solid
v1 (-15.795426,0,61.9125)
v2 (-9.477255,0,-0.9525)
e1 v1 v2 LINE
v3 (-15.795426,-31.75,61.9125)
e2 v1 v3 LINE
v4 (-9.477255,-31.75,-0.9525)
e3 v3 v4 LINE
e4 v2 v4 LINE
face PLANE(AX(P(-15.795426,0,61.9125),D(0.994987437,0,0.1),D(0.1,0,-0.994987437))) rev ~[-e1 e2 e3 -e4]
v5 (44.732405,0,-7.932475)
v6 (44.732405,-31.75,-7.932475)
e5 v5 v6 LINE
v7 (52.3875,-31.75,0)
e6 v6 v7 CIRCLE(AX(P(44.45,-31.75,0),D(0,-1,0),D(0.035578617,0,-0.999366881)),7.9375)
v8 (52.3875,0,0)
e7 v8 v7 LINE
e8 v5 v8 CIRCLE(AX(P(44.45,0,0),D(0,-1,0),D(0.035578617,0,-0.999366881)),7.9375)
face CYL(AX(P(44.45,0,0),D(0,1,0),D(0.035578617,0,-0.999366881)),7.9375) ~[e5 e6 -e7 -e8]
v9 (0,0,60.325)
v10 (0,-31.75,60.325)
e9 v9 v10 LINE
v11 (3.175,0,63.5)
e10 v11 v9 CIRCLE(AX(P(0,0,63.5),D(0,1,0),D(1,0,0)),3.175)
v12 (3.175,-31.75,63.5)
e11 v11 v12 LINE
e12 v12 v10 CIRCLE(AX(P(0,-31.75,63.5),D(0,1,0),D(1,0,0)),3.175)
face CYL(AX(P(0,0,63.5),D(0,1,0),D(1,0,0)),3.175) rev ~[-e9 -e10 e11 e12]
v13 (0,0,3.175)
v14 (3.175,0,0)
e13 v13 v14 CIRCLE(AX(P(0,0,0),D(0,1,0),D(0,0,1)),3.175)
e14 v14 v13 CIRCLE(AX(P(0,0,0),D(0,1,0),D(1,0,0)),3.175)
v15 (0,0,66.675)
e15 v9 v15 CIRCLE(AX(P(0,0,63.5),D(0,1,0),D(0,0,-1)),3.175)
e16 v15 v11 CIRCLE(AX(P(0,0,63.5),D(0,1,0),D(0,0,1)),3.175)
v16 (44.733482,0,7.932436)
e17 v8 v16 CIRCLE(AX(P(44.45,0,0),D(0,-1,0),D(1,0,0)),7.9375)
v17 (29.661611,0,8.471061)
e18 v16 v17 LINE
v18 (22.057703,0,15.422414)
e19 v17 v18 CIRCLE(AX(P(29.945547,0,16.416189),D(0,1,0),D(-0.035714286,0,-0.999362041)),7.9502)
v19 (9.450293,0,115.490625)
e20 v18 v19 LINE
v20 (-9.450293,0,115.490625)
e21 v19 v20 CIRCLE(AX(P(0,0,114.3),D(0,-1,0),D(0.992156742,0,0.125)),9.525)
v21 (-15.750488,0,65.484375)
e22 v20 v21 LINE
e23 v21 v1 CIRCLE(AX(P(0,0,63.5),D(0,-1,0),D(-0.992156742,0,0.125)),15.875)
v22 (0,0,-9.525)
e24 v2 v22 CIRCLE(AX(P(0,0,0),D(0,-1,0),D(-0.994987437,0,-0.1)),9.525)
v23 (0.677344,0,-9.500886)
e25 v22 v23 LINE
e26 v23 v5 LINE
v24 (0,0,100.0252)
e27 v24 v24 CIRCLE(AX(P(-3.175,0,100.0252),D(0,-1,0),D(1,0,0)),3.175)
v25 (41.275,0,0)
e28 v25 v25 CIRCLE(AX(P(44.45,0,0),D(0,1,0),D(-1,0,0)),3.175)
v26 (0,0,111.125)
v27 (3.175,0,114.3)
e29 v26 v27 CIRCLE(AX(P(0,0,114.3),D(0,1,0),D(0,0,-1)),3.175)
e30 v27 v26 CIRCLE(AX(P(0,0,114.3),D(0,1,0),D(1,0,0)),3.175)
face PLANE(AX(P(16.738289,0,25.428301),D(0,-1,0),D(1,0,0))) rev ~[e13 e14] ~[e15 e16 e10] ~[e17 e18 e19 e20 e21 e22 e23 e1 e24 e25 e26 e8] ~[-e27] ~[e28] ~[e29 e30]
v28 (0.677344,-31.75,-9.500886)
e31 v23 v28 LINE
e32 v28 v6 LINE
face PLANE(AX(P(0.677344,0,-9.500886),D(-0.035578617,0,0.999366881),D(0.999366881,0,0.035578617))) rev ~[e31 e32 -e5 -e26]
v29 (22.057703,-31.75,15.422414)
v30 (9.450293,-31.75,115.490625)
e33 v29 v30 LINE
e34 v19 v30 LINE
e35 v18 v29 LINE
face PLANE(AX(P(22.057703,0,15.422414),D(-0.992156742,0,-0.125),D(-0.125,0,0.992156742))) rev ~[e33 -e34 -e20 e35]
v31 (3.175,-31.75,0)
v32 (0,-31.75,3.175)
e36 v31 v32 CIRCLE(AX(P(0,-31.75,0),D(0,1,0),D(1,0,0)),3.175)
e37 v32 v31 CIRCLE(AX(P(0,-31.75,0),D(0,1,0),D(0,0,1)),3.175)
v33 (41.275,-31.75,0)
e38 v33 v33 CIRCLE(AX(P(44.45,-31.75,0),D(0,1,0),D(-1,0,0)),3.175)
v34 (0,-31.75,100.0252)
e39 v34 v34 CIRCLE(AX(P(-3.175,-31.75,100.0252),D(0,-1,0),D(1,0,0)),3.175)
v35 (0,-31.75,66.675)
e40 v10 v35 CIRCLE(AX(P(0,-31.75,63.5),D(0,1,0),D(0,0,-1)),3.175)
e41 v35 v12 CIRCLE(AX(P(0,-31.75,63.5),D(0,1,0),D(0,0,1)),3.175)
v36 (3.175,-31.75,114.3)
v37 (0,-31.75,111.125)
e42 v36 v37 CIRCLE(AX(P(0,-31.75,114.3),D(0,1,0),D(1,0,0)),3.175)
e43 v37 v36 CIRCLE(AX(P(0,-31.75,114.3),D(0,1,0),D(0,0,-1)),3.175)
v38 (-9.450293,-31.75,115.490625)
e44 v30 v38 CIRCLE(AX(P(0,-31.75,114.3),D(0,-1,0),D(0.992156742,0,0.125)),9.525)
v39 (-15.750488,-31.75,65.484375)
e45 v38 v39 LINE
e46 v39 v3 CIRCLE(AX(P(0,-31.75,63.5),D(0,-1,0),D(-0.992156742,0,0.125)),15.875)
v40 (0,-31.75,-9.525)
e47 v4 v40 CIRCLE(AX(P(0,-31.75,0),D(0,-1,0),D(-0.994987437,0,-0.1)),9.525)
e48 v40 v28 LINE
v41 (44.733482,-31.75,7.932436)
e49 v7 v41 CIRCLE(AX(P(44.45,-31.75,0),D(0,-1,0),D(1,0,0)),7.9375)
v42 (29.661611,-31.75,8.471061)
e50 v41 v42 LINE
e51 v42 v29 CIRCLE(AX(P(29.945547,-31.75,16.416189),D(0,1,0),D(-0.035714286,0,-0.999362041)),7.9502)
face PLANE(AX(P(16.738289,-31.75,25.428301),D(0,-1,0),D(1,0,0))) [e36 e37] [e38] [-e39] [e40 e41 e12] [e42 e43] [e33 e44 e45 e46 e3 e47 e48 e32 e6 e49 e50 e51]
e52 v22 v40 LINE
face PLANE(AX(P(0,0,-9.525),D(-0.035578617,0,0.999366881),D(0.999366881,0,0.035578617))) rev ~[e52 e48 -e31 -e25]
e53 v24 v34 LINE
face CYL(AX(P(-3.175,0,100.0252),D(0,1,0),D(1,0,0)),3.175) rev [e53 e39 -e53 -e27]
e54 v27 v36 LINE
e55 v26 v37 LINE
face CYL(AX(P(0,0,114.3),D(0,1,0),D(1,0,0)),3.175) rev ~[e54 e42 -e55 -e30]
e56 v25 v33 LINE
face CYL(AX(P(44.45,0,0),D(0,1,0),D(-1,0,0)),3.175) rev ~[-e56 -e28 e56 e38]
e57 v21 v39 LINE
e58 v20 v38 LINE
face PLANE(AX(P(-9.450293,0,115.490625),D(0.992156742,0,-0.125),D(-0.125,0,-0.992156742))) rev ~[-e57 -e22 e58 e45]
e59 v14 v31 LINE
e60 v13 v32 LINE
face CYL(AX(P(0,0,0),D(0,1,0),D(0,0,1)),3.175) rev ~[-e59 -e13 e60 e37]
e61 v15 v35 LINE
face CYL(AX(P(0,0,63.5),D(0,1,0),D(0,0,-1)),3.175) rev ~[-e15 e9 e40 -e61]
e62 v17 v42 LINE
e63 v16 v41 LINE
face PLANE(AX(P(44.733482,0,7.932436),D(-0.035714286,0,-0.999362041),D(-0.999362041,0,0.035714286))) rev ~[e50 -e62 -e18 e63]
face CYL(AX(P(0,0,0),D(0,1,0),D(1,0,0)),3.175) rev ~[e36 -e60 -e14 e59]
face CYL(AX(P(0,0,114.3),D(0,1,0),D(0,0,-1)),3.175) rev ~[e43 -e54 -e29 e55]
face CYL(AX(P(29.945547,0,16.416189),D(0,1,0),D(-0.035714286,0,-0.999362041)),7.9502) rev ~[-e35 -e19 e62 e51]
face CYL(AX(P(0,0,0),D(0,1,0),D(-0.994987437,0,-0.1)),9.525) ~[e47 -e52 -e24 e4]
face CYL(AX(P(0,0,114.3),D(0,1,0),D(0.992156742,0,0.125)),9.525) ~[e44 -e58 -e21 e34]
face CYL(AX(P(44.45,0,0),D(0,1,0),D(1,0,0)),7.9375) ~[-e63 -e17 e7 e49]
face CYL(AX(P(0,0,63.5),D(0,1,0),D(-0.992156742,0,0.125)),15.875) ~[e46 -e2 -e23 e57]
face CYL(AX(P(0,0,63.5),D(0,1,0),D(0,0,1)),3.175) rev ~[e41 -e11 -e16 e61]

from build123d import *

# Parameters (mm, degrees)
F0_R     = 3.175
F1_DEPTH = 31.75


with BuildPart() as f1:
    # F0 (on Front) → F1 (new body)
    with BuildSketch(Plane.XZ):
        with BuildLine():
            Line((22.0577025061, 15.4224140263), (15.7504882737, 65.484375))
            ThreePointArc((15.7504882737, 65.484375), (15.8438414904, 64.4941387366), (15.875, 63.5))
            ThreePointArc((15.875, 63.5), (11.2253201513, 52.2746798487), (0, 47.625))
            Line((0, 47.625), (0, 9.525))
            ThreePointArc((0, 9.525), (6.7351920908, 6.7351920908), (9.525, 0))
            Line((9.525, 0), (36.5125, 0))
            ThreePointArc((36.5125, 0), (38.9384772185, 5.7120069047), (44.7334821429, 7.9324362036))
            Line((44.7334821429, 7.9324362036), (29.6616113193, 8.4710609247))
            ThreePointArc((29.6616113193, 8.4710609247), (24.5813298898, 10.5484079743), (22.0577025061, 15.4224140263))
        make_face()
        with BuildLine():
            ThreePointArc((9.4502929642, 115.490625), (9.5063048942, 114.896483242), (9.525, 114.3))
            ThreePointArc((9.525, 114.3), (6.7351920908, 107.5648079092), (0, 104.775))
            Line((0, 104.775), (0, 100.0252))
            Line((0, 100.0252), (0, 79.375))
            ThreePointArc((0, 79.375), (10.5003255158, 75.40625), (15.7504882737, 65.484375))
            Line((15.7504882737, 65.484375), (9.4502929642, 115.490625))
        make_face()
        with BuildLine():
            Line((0, 100.0252), (0, 104.775))
            ThreePointArc((0, 104.775), (-7.14375, 107.9998046905), (-9.4502929642, 115.490625))
            Line((-9.4502929642, 115.490625), (-15.7504882737, 65.484375))
            ThreePointArc((-15.7504882737, 65.484375), (-10.5003255158, 75.40625), (0, 79.375))
            Line((0, 79.375), (0, 100.0252))
        make_face()
        with Locations((-3.175, 100.0252)):
            Circle(F0_R, mode=Mode.SUBTRACT)
        with BuildLine():
            ThreePointArc((0, 104.775), (6.7351920908, 107.5648079092), (9.525, 114.3))
            ThreePointArc((9.525, 114.3), (9.5063048942, 114.896483242), (9.4502929642, 115.490625))
            ThreePointArc((9.4502929642, 115.490625), (0, 123.825), (-9.4502929642, 115.490625))
            ThreePointArc((-9.4502929642, 115.490625), (-7.14375, 107.9998046905), (0, 104.775))
        make_face()
        with BuildLine():
            ThreePointArc((3.175, 114.3), (2.2450640303, 112.0549359697), (0, 111.125))
            ThreePointArc((0, 111.125), (-2.2450640303, 116.5450640303), (3.175, 114.3))
        make_face(mode=Mode.SUBTRACT)
        with BuildLine():
            Line((36.5125, 0), (9.525, 0))
            ThreePointArc((9.525, 0), (6.9705567315, -6.4912990883), (0.6773435479, -9.500885786))
            Line((0.6773435479, -9.500885786), (44.7324052746, -7.9324746146))
            ThreePointArc((44.7324052746, -7.9324746146), (38.9380895153, -5.7116327839), (36.5125, 0))
        make_face()
        with BuildLine():
            ThreePointArc((0, 9.525), (-7.063929059, 6.3895642457), (-9.4772553384, -0.9525))
            ThreePointArc((-9.4772553384, -0.9525), (-6.3895642457, -7.063929059), (0, -9.525))
            Line((0, -9.525), (0.6773435479, -9.500885786))
            ThreePointArc((0.6773435479, -9.500885786), (6.9705567315, -6.4912990883), (9.525, 0))
            Line((9.525, 0), (3.175, 0))
            ThreePointArc((3.175, 0), (-2.2450640303, -2.2450640303), (0, 3.175))
            Line((0, 3.175), (0, 9.525))
        make_face()
        with BuildLine():
            ThreePointArc((9.525, 0), (6.7351920908, 6.7351920908), (0, 9.525))
            Line((0, 9.525), (0, 3.175))
            ThreePointArc((0, 3.175), (2.2450640303, 2.2450640303), (3.175, 0))
            Line((3.175, 0), (9.525, 0))
        make_face()
        with BuildLine():
            ThreePointArc((52.3875, 0), (50.1620069047, 5.5115227815), (44.7334821429, 7.9324362036))
            ThreePointArc((44.7334821429, 7.9324362036), (38.9384772185, 5.7120069047), (36.5125, 0))
            ThreePointArc((36.5125, 0), (38.9380895153, -5.7116327839), (44.7324052746, -7.9324746146))
            ThreePointArc((44.7324052746, -7.9324746146), (50.1616327839, -5.5119104847), (52.3875, 0))
        make_face()
        with BuildLine():
            ThreePointArc((47.625, 0), (44.45, -3.175), (41.275, 0))
            ThreePointArc((41.275, 0), (44.45, 3.175), (47.625, 0))
        make_face(mode=Mode.SUBTRACT)
        with BuildLine():
            ThreePointArc((0, 79.375), (-10.5003255158, 75.40625), (-15.7504882737, 65.484375))
            ThreePointArc((-15.7504882737, 65.484375), (-15.8737438155, 63.6997054867), (-15.7954255641, 61.9125))
            ThreePointArc((-15.7954255641, 61.9125), (-10.6492737428, 51.7267849017), (0, 47.625))
            Line((0, 47.625), (0, 60.325))
            ThreePointArc((0, 60.325), (-3.175, 63.5), (0, 66.675))
            Line((0, 66.675), (0, 79.375))
        make_face()
        with BuildLine():
            ThreePointArc((15.875, 63.5), (15.8438414904, 64.4941387366), (15.7504882737, 65.484375))
            ThreePointArc((15.7504882737, 65.484375), (10.5003255158, 75.40625), (0, 79.375))
            Line((0, 79.375), (0, 66.675))
            ThreePointArc((0, 66.675), (2.2450640303, 65.7450640303), (3.175, 63.5))
            ThreePointArc((3.175, 63.5), (2.2450640303, 61.2549359697), (0, 60.325))
            Line((0, 60.325), (0, 47.625))
            ThreePointArc((0, 47.625), (11.2253201513, 52.2746798487), (15.875, 63.5))
        make_face()
        with BuildLine():
            ThreePointArc((0, 47.625), (-10.6492737428, 51.7267849017), (-15.7954255641, 61.9125))
            Line((-15.7954255641, 61.9125), (-9.4772553384, -0.9525))
            ThreePointArc((-9.4772553384, -0.9525), (-7.063929059, 6.3895642457), (0, 9.525))
            Line((0, 9.525), (0, 47.625))
        make_face()
    extrude(amount=F1_DEPTH)


solid = f1.part
